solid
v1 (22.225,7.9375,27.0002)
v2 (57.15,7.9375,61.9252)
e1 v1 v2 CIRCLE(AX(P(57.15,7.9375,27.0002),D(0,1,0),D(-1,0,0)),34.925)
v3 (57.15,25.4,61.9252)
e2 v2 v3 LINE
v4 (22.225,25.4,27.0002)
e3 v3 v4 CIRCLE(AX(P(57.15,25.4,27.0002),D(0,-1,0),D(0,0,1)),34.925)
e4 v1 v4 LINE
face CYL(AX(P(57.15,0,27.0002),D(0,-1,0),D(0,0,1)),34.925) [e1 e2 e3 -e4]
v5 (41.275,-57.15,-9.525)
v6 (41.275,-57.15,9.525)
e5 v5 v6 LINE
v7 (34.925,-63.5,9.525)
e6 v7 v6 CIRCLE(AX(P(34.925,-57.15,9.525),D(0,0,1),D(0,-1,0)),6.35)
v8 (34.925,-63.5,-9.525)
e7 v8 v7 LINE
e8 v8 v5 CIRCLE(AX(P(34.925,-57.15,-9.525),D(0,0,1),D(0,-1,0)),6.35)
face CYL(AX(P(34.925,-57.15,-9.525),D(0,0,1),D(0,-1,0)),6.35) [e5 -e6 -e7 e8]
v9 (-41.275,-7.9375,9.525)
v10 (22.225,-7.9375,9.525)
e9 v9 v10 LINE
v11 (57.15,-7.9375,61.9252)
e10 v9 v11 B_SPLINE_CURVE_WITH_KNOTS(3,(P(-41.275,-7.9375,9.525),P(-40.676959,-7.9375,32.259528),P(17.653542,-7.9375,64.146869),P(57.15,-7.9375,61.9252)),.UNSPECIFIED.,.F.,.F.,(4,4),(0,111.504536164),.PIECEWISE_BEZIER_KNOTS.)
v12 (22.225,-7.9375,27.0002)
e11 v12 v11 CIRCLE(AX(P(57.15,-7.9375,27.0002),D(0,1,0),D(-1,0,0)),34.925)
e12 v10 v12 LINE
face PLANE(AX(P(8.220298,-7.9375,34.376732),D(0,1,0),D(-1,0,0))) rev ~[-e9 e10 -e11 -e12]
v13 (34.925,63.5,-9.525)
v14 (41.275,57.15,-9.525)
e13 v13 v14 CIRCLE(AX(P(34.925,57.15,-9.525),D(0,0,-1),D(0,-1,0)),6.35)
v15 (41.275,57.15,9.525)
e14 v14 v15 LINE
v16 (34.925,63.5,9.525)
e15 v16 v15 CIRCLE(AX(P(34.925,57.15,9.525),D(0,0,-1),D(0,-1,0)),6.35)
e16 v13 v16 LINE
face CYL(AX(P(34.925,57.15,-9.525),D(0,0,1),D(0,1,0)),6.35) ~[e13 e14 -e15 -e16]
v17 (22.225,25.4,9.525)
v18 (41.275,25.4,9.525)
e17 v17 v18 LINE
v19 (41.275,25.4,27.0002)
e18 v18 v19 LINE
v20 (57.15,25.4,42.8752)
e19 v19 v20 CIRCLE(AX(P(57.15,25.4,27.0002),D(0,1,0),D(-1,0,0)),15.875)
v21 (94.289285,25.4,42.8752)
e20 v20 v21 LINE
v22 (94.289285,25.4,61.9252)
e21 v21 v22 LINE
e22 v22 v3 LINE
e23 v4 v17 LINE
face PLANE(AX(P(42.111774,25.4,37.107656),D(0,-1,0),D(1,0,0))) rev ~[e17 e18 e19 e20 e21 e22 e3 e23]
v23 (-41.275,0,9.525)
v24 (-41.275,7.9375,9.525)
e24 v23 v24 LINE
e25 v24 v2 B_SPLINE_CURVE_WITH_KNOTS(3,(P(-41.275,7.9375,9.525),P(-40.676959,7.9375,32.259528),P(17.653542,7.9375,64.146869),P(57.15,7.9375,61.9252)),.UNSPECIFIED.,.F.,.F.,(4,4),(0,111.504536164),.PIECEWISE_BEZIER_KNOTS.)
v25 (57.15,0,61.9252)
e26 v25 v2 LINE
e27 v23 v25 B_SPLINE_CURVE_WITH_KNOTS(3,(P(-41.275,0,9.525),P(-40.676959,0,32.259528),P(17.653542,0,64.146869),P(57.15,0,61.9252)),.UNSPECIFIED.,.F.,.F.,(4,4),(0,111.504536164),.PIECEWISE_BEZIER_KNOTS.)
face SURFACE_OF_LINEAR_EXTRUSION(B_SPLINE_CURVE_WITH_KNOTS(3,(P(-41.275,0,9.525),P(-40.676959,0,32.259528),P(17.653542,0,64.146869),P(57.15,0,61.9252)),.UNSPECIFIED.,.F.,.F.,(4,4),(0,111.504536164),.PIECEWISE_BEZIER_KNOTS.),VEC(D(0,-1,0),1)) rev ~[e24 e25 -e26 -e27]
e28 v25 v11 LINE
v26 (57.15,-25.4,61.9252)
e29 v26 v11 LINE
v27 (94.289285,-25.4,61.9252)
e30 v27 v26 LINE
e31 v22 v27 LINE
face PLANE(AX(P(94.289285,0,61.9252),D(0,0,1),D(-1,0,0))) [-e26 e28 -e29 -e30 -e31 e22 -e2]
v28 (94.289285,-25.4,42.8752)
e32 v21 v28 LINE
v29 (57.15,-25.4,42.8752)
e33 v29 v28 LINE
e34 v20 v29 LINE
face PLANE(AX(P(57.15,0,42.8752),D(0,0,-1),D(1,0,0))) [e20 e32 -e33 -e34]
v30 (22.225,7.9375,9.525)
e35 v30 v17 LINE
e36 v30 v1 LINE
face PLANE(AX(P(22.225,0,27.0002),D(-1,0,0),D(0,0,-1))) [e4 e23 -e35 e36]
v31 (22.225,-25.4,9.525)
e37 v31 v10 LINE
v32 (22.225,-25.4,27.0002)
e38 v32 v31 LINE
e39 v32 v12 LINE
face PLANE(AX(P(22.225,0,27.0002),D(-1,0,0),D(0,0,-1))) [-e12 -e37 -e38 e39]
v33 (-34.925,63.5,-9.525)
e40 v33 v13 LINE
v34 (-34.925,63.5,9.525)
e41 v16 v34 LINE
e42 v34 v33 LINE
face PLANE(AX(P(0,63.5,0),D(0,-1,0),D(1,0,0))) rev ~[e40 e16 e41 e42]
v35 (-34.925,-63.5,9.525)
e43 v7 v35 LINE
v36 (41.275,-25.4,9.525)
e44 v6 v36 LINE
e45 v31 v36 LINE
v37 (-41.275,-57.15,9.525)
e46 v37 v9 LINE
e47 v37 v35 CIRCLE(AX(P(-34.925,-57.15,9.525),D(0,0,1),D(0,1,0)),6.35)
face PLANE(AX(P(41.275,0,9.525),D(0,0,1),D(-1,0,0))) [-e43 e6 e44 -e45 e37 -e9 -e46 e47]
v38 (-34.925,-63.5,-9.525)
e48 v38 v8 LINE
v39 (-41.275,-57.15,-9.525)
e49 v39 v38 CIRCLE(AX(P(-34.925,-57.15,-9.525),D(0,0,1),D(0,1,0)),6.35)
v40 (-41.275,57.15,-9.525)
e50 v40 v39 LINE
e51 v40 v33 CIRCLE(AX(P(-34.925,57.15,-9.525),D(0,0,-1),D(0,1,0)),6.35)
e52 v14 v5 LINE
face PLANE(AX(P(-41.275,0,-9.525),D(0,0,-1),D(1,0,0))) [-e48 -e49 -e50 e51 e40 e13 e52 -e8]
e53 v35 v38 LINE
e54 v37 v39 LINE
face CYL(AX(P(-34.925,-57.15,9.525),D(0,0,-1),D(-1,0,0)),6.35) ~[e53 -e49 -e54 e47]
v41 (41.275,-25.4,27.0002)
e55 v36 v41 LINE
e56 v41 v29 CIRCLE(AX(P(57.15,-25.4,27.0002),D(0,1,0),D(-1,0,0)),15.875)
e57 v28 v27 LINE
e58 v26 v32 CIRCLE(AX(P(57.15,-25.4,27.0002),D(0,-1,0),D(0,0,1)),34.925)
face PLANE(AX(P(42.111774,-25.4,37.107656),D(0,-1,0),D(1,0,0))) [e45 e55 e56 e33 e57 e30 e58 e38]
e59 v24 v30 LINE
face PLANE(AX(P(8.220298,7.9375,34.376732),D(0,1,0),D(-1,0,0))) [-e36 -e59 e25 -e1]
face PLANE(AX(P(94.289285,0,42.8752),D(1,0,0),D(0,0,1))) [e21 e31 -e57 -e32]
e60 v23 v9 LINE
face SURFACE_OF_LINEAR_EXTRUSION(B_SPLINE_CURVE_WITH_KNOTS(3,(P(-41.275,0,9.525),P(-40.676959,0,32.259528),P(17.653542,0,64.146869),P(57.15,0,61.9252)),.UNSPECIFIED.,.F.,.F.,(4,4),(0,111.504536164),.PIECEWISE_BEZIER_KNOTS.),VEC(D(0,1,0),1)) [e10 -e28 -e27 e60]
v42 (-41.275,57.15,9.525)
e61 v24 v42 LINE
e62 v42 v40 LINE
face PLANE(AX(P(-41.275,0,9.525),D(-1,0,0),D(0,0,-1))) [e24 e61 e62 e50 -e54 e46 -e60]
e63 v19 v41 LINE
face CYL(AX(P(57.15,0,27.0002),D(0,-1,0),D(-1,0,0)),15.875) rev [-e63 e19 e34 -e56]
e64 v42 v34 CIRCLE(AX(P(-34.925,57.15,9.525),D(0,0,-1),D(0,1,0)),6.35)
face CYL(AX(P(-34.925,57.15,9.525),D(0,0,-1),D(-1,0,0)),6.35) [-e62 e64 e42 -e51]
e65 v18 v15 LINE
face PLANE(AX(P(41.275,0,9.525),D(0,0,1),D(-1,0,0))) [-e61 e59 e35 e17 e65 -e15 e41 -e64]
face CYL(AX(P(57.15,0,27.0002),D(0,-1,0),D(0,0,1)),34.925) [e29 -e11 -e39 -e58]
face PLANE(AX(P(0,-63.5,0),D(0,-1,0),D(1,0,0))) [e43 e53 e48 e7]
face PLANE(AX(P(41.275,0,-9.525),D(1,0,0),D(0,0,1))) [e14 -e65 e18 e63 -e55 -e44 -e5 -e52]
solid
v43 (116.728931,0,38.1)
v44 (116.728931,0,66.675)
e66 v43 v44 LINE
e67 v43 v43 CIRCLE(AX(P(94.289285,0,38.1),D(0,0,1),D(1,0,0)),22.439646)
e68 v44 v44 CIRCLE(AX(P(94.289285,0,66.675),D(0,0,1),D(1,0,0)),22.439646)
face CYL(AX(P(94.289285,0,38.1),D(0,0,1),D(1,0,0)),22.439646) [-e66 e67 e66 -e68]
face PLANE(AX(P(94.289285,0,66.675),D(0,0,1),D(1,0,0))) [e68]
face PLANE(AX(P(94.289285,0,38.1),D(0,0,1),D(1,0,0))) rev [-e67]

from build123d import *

# Parameters (mm, degrees)
F1_DEPTH = 63.5
F0_W     = 28.3603538342
F0_H     = 19.05
F2_DEPTH = 25.4
F3_DEPTH = 7.9375
F5_R     = 6.35


with BuildPart() as f1:
    # F0 (on Front) → F1 (new body, symmetric)
    with BuildSketch(Plane.XZ):
        Polygon((-41.275, 9.525), (-41.275, -9.525), (41.275, -9.525), (41.275, 9.525), (22.225, 9.525), align=None)
    extrude(amount=F1_DEPTH, both=True)

    # F0 (on Front) → F2 (join, symmetric)
    with BuildSketch(Plane.XZ):
        with BuildLine():
            Line((22.225, 9.525), (41.275, 9.525))
            Line((41.275, 9.525), (41.275, 27.0002))
            ThreePointArc((41.275, 27.0002), (45.9246798487, 38.2255201513), (57.15, 42.8752))
            Line((57.15, 42.8752), (65.9289314961, 42.8752))
            Line((65.9289314961, 42.8752), (65.9289314961, 61.9252))
            Line((65.9289314961, 61.9252), (57.15, 61.9252))
            ThreePointArc((57.15, 61.9252), (32.4542956671, 51.6959043329), (22.225, 27.0002))
            Line((22.225, 27.0002), (22.225, 9.525))
        make_face()
        with Locations((80.1091084132, 52.4002)):
            Rectangle(F0_W, F0_H)
    extrude(amount=F2_DEPTH, both=True)

    # F0 (on Front) → F3 (join, symmetric)
    with BuildSketch(Plane.XZ):
        with BuildLine():
            add(Edge.make_bspline(
                [(-41.275, 9.525), (-40.676958859, 32.2595275939), (17.6535416394, 64.1468688846), (57.15, 61.9252)],
                knots=[0, 0, 0, 0, 111.5045361635, 111.5045361635, 111.5045361635, 111.5045361635], degree=3))
            Line((-41.275, 9.525), (22.225, 9.525))
            Line((22.225, 9.525), (22.225, 27.0002))
            ThreePointArc((22.225, 27.0002), (32.4542956671, 51.6959043329), (57.15, 61.9252))
        make_face()
    extrude(amount=F3_DEPTH, both=True)

    # F5
    f5_edges = [f1.edges().sort_by_distance(p)[0] for p in [
        (41.275, -63.5, 0),
        (-41.275, -63.5, 0),
        (41.275, 63.5, 0),
        (-41.275, 63.5, 0),
    ]]
    fillet(f5_edges, radius=F5_R)


with BuildPart() as f4:
    # F0 (on Front) → F4 (revolve)
    with BuildSketch(Plane.XZ):
        Polygon((94.2892853303, 66.675), (94.2892853303, 61.9252), (94.2892853303, 42.8752), (94.2892853303, 38.1), (116.7289314961, 38.1), (116.7289314961, 66.675), align=None)
    revolve(axis=Axis((94.2892853303, 0, 52.3875), (0, 0, 1)))


solid = Compound([f1.part, f4.part])
